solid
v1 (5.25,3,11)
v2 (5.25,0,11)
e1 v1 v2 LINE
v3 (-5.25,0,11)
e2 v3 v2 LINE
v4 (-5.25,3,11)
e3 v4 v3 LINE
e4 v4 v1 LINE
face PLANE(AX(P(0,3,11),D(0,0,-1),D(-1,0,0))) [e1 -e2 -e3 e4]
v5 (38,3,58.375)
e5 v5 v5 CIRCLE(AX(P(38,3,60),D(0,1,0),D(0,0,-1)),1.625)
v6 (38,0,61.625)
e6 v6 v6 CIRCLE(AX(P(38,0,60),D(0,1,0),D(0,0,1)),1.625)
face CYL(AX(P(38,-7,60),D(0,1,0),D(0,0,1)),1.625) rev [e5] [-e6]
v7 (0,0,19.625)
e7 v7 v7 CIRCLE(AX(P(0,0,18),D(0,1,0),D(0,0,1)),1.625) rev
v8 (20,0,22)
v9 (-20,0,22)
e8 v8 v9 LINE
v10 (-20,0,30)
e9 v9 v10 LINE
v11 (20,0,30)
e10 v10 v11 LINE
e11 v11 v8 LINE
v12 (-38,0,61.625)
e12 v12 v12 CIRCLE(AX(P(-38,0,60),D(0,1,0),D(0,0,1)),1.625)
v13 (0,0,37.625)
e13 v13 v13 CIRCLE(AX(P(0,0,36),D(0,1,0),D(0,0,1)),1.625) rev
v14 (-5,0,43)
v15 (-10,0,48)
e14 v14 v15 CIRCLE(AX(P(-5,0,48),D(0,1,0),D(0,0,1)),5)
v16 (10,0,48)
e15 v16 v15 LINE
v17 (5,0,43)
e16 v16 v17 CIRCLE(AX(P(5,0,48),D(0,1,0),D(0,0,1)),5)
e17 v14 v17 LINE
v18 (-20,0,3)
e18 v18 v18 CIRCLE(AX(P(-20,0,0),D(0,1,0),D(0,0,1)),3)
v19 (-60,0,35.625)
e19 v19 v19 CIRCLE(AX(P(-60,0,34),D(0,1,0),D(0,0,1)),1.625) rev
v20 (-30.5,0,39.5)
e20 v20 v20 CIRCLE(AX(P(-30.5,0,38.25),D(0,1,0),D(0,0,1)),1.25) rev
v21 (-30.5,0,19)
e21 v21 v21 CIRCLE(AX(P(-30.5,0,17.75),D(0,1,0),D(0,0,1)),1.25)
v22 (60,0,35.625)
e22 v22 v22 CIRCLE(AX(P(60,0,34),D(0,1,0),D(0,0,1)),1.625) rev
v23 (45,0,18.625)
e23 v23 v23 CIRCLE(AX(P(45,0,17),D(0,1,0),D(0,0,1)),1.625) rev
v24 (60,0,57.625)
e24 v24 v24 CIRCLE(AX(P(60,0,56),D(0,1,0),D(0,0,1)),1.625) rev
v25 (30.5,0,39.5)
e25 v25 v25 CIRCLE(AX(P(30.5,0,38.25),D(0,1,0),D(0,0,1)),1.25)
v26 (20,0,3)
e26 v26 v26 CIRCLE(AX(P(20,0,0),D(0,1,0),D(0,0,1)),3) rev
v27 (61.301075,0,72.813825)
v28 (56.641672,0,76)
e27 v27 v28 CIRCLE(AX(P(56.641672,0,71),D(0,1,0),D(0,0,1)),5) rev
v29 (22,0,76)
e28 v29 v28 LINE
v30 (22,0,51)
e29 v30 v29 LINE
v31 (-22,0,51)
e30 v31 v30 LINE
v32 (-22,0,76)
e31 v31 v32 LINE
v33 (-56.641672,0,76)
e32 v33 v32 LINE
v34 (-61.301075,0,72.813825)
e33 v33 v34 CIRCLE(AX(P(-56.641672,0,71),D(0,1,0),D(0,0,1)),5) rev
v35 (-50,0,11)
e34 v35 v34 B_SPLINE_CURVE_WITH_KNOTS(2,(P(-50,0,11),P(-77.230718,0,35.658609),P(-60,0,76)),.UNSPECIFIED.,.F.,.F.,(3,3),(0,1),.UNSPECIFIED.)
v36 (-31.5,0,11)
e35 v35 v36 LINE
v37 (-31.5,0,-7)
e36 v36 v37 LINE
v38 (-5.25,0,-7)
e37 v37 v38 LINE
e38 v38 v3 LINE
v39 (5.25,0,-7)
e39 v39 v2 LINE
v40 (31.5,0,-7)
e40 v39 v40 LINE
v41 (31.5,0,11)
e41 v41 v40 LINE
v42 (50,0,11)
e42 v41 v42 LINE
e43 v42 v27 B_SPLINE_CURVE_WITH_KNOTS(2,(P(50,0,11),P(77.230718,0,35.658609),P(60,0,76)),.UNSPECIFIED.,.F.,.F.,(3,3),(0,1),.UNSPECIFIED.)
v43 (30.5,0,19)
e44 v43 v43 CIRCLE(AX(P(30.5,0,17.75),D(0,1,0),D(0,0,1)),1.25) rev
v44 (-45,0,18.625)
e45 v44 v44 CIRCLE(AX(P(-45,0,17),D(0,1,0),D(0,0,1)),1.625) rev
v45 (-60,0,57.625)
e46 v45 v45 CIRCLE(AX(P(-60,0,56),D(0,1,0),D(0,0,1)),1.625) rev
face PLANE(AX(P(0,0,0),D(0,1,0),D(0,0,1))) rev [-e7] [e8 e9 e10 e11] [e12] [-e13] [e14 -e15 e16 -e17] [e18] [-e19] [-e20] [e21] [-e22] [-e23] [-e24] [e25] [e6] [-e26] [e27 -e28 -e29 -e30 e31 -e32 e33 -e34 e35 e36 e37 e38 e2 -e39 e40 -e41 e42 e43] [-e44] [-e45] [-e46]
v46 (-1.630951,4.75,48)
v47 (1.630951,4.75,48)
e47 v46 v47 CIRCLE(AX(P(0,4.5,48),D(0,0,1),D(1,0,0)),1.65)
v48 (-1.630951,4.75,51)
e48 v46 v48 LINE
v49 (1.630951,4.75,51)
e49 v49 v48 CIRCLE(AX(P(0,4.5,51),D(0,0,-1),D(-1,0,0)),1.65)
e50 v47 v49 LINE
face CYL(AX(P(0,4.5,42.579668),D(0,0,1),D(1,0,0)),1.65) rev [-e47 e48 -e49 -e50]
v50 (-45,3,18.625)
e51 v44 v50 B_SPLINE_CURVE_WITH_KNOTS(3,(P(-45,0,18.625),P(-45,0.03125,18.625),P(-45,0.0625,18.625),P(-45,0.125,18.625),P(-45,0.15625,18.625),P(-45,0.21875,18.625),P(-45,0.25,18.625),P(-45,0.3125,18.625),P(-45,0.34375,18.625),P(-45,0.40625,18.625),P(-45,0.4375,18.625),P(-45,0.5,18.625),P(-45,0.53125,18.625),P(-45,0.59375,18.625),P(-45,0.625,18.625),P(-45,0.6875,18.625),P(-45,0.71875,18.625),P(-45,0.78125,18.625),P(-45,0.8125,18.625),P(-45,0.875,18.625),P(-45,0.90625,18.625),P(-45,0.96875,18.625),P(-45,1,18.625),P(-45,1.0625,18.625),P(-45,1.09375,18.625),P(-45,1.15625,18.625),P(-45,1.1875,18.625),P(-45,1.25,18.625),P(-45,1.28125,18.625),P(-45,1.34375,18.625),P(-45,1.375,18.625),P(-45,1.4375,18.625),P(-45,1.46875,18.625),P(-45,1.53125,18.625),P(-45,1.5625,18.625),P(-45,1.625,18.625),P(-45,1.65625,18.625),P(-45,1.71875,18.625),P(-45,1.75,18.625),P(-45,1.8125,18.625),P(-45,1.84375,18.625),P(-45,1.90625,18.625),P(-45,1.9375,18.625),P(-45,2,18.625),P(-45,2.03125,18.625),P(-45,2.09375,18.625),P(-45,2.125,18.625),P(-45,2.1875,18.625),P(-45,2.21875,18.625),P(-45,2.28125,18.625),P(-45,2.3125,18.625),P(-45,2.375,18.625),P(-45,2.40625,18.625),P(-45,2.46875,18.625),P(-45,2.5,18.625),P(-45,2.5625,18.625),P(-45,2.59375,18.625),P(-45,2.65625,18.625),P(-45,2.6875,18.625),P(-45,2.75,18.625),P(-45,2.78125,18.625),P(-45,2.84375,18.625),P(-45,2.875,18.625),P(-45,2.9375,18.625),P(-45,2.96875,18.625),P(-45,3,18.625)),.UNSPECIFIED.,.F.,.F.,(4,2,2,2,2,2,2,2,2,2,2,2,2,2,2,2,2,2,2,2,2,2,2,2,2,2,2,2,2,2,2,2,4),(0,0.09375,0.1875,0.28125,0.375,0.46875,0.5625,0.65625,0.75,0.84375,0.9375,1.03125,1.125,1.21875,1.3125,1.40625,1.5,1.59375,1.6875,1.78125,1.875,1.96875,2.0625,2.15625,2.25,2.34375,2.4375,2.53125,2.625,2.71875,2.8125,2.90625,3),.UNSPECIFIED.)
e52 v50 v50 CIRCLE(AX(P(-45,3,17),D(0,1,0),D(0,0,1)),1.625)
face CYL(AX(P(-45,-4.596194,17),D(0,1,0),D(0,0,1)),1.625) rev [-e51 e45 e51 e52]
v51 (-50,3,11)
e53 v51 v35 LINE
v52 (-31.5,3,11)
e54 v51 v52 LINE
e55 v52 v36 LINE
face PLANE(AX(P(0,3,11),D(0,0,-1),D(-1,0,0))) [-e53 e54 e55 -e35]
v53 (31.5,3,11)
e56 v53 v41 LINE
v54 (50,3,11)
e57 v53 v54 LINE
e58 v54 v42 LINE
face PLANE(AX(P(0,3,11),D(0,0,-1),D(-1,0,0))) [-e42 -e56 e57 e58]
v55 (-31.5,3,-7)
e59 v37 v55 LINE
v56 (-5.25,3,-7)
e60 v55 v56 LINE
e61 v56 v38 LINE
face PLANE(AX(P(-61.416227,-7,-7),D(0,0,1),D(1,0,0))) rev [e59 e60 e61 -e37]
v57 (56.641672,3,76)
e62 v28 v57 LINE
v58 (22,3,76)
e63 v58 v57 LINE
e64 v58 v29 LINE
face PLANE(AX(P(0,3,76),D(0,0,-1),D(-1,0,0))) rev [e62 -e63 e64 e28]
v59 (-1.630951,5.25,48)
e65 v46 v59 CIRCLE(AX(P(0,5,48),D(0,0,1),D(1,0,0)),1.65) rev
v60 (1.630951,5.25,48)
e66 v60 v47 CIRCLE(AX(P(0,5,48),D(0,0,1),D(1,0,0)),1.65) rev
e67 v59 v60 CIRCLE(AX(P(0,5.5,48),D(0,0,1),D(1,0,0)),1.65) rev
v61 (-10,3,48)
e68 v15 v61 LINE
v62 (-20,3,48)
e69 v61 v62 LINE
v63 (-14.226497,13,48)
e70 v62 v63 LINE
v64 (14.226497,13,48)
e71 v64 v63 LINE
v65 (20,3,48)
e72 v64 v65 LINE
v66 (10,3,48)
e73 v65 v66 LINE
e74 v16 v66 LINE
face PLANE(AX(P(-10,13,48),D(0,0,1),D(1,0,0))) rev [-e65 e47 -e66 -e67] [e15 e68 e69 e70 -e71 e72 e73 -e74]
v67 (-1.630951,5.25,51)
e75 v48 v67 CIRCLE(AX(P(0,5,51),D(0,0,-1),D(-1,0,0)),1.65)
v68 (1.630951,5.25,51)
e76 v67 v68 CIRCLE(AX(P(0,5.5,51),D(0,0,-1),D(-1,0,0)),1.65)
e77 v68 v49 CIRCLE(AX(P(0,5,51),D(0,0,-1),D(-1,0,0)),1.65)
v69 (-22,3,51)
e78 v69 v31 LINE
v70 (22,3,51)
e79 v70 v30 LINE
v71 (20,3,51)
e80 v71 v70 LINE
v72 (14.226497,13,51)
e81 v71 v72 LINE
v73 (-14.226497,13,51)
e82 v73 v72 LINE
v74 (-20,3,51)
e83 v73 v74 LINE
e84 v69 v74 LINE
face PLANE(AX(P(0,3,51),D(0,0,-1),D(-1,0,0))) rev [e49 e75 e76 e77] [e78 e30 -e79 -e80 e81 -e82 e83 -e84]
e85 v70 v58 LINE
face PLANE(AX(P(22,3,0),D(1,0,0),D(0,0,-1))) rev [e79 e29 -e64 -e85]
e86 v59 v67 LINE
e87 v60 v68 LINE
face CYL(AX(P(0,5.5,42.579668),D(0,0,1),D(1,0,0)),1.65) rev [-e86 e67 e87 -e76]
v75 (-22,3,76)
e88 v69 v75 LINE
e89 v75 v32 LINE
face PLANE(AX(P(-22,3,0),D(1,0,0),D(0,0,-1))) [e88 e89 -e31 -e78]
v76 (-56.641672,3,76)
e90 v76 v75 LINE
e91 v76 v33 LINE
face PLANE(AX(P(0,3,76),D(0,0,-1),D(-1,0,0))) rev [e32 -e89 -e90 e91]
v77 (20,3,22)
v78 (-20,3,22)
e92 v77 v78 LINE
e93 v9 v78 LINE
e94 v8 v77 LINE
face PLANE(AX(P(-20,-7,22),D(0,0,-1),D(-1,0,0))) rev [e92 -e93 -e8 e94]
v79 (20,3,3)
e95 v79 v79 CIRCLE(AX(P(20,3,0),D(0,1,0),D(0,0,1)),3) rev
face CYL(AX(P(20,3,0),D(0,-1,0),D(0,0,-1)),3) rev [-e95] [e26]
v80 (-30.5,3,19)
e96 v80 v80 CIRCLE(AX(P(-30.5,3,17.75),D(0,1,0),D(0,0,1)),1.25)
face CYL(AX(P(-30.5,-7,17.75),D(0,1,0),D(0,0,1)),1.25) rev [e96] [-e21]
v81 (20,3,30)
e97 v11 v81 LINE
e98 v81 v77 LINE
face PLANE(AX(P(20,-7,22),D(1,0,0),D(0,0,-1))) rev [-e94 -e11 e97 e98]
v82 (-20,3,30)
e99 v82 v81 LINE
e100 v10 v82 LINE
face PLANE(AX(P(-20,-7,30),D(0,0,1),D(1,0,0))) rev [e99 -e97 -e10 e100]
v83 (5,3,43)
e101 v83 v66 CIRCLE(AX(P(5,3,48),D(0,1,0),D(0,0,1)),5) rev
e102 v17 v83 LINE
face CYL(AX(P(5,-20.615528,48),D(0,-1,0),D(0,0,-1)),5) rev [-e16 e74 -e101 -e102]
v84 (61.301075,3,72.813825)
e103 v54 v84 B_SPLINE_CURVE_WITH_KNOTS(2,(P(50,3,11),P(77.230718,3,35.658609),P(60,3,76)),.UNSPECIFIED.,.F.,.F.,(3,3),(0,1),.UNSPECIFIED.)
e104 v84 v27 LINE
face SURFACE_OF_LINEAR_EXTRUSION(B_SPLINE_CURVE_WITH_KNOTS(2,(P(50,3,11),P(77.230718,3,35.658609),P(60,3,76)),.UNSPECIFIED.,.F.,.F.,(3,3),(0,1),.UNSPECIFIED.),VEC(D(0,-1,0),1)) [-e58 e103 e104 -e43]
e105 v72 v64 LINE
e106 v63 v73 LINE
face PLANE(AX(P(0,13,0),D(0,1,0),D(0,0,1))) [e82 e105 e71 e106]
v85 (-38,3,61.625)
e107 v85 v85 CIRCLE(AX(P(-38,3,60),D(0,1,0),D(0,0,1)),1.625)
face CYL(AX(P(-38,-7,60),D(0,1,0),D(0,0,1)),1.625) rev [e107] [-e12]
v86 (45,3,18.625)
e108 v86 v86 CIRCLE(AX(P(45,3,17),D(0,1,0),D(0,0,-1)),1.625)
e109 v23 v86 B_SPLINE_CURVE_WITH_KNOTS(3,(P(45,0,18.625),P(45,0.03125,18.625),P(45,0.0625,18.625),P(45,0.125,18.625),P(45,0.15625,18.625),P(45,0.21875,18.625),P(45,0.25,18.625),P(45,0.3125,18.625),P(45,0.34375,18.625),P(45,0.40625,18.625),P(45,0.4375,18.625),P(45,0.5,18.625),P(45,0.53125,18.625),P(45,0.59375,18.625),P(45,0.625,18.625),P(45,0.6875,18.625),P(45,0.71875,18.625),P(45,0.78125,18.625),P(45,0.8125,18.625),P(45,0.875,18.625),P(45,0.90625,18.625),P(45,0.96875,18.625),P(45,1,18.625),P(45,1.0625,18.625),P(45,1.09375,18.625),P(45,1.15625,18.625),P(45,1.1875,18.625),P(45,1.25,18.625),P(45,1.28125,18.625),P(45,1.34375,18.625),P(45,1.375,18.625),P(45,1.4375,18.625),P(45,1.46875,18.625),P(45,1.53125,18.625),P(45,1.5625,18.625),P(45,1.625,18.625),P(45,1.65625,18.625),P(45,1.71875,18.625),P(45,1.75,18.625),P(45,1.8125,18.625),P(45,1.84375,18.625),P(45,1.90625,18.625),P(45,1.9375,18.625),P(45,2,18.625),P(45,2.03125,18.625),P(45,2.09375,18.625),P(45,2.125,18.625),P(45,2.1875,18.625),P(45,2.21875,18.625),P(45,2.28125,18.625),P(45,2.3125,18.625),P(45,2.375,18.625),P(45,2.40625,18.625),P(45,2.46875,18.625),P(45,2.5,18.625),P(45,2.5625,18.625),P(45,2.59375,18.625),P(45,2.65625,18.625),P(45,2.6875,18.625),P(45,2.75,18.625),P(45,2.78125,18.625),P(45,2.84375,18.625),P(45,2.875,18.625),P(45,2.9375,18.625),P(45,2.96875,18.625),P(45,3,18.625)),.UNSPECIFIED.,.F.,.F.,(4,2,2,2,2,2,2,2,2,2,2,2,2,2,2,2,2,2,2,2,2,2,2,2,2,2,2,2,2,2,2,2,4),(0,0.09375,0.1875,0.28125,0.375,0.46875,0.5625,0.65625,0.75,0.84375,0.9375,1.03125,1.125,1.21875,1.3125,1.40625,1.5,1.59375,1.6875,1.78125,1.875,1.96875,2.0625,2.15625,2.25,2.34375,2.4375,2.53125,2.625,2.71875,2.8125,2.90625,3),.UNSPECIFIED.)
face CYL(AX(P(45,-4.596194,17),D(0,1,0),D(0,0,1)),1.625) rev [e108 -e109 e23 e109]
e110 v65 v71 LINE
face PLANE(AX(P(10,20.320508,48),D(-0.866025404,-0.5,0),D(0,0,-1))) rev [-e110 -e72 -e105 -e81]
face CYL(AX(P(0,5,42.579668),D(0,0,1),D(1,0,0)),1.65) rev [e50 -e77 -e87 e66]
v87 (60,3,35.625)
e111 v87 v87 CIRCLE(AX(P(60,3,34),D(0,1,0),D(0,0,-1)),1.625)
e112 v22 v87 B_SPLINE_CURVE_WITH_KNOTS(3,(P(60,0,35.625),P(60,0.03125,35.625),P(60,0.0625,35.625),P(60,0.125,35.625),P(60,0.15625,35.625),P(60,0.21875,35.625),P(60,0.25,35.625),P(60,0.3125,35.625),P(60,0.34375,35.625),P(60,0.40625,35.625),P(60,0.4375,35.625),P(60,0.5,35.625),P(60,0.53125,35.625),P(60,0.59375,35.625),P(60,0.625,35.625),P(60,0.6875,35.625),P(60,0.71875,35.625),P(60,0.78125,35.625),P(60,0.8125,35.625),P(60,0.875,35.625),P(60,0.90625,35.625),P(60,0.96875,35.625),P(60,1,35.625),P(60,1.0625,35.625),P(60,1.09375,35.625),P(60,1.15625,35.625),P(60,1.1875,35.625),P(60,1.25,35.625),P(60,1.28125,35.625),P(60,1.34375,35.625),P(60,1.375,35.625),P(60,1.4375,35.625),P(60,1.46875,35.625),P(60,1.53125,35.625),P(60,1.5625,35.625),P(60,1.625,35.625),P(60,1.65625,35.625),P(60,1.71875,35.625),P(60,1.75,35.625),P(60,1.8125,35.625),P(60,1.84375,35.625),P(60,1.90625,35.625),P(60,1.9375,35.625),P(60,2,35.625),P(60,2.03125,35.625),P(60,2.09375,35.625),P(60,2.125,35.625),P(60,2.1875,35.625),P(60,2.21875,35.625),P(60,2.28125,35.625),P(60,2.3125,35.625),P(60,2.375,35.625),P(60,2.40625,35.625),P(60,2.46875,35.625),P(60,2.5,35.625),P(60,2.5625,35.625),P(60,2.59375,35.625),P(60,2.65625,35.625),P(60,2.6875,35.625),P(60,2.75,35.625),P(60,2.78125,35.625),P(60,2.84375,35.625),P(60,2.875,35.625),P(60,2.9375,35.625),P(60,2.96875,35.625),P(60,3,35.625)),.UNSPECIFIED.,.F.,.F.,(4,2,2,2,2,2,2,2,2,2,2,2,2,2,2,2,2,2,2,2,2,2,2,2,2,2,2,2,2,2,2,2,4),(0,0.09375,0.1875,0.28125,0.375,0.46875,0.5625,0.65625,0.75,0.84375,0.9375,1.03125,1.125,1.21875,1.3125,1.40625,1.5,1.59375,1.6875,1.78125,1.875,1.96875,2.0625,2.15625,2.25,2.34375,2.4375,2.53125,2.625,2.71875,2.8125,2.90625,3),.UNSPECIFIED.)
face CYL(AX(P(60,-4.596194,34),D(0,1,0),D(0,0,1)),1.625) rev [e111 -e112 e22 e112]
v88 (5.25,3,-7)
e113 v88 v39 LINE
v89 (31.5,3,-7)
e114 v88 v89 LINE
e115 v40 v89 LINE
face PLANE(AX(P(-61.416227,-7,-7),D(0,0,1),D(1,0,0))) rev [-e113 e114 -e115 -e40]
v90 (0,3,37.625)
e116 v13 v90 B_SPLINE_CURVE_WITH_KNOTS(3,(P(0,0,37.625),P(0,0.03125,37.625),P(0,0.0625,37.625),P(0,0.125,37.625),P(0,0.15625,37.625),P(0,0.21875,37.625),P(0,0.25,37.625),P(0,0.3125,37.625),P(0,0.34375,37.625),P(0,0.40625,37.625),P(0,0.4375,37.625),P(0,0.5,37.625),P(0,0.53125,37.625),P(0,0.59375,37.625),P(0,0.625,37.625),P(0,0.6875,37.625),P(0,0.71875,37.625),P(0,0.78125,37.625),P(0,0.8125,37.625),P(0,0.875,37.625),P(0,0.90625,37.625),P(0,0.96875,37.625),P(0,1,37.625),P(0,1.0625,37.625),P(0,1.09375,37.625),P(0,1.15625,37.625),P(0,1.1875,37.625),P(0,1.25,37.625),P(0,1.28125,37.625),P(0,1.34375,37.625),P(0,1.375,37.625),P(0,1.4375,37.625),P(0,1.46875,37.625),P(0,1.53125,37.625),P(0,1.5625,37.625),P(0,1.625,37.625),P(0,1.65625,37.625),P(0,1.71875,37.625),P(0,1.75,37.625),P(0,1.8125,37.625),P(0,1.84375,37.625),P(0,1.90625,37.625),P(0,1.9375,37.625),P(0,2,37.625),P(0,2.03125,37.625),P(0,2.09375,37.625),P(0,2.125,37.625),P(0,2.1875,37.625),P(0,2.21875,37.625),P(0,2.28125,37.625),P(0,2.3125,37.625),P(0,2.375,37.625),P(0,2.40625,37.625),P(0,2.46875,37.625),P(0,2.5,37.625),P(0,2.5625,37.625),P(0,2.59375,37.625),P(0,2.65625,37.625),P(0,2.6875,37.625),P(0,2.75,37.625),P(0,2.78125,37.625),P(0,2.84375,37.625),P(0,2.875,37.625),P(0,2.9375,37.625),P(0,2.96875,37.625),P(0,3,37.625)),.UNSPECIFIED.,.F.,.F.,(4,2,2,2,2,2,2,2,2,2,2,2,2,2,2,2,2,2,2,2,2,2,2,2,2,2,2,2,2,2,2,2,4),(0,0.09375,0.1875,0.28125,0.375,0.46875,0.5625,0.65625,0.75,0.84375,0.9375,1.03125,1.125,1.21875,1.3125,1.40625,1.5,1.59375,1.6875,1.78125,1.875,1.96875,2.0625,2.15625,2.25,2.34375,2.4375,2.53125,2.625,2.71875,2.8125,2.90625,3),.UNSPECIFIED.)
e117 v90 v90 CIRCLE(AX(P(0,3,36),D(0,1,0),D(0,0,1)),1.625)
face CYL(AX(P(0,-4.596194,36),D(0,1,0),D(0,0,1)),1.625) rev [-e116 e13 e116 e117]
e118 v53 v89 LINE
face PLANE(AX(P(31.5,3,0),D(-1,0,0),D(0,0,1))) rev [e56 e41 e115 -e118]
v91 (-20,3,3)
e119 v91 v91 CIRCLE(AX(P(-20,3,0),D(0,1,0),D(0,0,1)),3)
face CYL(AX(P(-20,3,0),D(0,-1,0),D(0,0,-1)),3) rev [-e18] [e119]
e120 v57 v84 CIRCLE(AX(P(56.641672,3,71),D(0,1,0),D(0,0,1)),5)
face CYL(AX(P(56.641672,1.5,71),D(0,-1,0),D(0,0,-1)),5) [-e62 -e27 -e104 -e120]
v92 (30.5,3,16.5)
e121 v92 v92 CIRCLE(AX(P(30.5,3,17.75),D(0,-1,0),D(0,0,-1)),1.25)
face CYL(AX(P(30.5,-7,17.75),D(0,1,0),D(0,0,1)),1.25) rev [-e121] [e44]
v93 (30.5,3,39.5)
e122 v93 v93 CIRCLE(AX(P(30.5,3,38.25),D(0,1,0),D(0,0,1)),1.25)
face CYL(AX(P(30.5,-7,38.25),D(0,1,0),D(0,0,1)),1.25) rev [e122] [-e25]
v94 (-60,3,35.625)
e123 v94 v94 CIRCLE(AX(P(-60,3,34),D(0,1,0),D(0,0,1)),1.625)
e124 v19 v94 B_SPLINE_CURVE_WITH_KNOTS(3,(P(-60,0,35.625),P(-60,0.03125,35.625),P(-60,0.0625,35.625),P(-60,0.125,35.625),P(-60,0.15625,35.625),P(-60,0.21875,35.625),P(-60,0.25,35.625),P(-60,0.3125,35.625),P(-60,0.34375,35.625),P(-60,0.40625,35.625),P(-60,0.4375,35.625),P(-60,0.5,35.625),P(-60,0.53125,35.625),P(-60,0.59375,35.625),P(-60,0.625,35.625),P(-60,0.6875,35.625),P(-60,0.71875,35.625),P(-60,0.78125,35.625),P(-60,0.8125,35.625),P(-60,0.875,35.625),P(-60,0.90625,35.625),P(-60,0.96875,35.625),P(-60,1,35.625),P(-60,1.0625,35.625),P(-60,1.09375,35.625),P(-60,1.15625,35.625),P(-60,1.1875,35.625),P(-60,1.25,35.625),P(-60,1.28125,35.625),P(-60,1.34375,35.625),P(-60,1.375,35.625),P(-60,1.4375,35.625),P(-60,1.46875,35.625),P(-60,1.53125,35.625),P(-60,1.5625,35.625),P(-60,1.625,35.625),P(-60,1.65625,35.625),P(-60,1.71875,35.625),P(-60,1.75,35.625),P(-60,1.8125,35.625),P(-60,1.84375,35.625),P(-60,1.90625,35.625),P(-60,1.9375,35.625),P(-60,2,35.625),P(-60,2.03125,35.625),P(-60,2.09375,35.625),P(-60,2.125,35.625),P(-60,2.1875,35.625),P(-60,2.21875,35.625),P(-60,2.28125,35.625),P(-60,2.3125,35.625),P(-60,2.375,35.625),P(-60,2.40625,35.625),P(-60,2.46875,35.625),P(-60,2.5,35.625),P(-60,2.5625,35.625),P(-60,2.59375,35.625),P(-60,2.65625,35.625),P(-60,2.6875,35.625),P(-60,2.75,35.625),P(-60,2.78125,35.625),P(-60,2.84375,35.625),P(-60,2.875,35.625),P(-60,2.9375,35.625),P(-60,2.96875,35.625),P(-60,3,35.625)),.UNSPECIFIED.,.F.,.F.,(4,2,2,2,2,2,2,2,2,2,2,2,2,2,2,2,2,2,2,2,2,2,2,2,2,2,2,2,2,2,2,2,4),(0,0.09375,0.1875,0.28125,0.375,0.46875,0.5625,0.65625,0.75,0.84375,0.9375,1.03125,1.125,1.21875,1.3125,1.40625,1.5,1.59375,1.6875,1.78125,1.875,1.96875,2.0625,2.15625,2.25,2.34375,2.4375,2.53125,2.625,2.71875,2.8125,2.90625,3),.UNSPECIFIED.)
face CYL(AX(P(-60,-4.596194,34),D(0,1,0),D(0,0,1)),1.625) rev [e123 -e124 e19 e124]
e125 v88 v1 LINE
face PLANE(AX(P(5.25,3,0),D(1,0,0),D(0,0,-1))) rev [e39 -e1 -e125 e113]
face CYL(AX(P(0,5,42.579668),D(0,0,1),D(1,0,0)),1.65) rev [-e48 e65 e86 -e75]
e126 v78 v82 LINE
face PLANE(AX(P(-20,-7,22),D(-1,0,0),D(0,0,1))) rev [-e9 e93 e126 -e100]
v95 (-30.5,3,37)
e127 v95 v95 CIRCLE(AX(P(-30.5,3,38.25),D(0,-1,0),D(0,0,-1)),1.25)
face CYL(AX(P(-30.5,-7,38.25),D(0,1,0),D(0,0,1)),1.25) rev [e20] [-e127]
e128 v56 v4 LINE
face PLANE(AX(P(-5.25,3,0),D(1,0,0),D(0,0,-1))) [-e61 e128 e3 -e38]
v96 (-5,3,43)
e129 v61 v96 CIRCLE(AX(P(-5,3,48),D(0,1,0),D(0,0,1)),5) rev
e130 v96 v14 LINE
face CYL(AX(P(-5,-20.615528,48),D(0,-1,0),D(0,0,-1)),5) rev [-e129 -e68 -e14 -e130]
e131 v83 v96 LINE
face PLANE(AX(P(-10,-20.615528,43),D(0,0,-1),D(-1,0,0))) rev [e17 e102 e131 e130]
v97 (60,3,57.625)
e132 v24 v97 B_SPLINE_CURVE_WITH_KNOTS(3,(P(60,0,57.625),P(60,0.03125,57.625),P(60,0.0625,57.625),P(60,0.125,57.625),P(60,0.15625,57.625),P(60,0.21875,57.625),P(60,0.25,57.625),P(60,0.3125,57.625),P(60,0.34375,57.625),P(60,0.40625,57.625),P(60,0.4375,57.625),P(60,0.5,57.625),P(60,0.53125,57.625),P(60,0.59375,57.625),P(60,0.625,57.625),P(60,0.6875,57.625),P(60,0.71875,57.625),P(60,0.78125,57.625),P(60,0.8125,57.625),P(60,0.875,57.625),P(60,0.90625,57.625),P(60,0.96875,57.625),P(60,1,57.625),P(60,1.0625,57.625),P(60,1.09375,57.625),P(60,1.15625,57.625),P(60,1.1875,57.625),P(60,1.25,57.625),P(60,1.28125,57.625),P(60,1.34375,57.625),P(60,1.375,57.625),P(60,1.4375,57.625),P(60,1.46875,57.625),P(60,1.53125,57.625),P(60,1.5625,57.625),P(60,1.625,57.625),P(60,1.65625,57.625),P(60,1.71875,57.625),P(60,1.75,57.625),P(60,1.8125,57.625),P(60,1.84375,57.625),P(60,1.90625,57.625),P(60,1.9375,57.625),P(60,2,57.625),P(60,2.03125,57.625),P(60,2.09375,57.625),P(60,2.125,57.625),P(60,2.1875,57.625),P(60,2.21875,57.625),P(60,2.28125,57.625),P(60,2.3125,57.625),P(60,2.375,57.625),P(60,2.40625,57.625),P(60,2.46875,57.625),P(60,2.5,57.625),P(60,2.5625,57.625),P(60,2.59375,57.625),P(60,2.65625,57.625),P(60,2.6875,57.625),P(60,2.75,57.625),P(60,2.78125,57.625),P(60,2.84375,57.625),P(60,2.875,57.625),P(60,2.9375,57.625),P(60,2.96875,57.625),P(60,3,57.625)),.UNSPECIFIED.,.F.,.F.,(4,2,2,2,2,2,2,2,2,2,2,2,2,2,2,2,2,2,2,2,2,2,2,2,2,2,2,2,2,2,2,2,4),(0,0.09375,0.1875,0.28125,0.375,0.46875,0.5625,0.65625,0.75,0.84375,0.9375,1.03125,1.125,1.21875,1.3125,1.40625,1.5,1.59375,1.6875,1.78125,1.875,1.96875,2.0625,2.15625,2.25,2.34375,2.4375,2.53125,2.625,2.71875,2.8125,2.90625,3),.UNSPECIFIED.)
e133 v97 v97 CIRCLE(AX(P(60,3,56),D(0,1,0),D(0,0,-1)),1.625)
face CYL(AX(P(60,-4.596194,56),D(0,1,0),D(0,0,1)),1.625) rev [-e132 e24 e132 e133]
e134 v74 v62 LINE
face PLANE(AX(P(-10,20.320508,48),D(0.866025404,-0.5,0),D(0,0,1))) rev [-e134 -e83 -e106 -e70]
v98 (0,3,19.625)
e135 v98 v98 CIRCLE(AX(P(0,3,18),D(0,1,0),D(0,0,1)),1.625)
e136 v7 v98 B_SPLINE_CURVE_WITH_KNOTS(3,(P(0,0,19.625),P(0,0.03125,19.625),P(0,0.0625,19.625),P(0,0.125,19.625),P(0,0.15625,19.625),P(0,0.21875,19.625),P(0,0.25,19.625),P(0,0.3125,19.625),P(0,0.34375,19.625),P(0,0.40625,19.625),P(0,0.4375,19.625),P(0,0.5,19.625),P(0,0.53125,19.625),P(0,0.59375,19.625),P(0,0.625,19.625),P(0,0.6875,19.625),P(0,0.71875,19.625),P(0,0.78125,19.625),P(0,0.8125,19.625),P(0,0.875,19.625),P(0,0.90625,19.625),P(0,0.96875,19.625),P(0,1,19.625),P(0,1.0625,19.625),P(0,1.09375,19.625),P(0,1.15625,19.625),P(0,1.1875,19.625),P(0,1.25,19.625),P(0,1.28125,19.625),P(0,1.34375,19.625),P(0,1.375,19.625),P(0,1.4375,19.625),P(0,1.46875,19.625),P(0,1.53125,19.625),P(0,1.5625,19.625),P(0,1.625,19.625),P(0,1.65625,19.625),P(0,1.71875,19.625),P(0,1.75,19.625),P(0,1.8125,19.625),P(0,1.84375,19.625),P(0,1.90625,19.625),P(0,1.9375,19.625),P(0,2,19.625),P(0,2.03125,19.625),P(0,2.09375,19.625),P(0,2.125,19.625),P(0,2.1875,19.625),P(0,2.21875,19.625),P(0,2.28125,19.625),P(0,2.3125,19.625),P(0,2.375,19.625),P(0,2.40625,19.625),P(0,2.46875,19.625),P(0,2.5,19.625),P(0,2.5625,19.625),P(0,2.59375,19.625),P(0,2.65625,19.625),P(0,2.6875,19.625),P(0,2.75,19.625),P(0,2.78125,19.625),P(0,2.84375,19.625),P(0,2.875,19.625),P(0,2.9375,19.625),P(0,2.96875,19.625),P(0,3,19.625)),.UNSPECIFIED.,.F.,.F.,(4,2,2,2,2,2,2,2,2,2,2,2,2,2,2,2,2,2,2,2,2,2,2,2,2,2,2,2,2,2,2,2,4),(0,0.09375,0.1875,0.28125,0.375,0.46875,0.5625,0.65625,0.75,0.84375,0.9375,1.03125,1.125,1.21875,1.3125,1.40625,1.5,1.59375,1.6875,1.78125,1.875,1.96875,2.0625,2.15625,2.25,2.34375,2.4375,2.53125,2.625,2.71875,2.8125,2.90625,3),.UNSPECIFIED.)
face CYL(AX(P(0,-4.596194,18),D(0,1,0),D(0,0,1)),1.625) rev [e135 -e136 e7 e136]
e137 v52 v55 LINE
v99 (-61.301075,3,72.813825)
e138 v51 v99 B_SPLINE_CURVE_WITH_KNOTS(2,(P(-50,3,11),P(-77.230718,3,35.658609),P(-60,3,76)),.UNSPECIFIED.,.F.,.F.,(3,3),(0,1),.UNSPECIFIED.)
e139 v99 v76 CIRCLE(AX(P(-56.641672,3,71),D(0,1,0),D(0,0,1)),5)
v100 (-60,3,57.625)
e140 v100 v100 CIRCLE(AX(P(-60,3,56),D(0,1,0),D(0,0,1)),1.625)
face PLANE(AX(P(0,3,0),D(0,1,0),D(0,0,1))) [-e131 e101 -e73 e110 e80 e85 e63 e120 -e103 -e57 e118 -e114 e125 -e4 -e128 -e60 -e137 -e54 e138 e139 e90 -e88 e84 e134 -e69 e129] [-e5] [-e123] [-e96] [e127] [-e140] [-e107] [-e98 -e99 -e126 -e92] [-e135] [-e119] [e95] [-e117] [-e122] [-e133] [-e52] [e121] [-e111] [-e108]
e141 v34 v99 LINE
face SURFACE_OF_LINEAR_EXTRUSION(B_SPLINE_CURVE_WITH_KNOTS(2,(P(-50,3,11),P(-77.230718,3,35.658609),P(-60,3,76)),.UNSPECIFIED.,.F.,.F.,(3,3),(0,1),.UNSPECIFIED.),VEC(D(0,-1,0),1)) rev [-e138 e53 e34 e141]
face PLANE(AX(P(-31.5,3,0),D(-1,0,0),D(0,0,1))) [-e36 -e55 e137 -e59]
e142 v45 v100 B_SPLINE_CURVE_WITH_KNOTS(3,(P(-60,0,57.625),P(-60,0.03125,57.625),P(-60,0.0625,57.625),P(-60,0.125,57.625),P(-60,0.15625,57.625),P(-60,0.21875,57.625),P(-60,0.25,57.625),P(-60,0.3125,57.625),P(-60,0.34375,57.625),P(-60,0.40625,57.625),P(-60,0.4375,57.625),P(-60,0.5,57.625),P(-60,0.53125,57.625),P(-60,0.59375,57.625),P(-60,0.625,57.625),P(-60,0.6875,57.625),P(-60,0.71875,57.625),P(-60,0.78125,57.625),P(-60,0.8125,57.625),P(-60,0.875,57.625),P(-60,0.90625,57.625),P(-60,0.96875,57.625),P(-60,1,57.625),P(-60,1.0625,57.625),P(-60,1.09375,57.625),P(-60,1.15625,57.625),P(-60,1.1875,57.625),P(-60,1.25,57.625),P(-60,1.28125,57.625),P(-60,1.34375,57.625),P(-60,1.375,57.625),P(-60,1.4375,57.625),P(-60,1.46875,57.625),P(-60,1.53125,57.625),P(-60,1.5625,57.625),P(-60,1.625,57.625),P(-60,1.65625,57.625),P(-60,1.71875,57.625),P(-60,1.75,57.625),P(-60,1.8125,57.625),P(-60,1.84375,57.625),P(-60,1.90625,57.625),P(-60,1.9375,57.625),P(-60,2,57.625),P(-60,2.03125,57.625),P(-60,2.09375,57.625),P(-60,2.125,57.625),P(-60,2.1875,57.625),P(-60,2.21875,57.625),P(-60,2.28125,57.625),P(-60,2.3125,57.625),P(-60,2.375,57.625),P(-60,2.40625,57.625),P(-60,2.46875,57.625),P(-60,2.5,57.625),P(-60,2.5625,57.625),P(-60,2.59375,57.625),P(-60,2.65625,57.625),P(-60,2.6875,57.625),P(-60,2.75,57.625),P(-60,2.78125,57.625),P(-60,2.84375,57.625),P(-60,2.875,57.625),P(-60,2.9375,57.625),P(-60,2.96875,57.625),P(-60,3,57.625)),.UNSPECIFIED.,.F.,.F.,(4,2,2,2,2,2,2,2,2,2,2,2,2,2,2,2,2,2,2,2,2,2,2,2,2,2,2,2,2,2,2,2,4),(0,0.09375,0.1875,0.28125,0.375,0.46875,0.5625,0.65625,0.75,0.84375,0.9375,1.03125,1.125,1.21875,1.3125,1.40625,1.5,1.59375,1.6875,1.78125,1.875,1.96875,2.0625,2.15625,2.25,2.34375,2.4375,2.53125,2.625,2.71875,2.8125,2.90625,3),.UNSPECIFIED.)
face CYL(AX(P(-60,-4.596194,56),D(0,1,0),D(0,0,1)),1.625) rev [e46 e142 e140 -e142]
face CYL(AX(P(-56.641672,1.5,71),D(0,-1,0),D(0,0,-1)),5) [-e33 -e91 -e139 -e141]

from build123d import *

# Parameters (mm, degrees)
SKETCH1_W           = 26.25
SKETCH1_H           = 22
SKETCH1_R           = 3
BOSS_EXTRUDE1_DEPTH = 3
FILLET1_R           = 5
SKETCH2_R           = 1.625
CUT_EXTRUDE1_DEPTH  = 3
SKETCH5_W           = 20
SKETCH5_H           = 3
BOSS_EXTRUDE2_DEPTH = 10
SKETCH6_R           = 1.65
CUT_EXTRUDE4_DEPTH  = 28
CHAMFER1_SIZE       = 10
CHAMFER1_SIZE_2     = 17.320508076
SKETCH9_W           = 20
SKETCH9_H           = 5
CUT_EXTRUDE6_DEPTH  = 3
FILLET3_R           = 5
SKETCH16_W          = 40
SKETCH16_H          = 8
CUT_EXTRUDE11_DEPTH = 10
SKETCH17_R          = 1.25
CUT_EXTRUDE12_DEPTH = 10
SKETCH18_W          = 114.543980026
SKETCH18_H          = 4
CUT_EXTRUDE13_DEPTH = 10
SKETCH3_R           = 1.625
CUT_EXTRUDE14_DEPTH = 10


# Some blends are built 0.0001 mm under size
with BuildPart() as part:
    # Sketch1 → Boss-Extrude1 (new body)
    # profile 1 of 3: a face of its own
    with BuildSketch(Plane(origin=(0, 0, 0), x_dir=(1, 0, 0), z_dir=(0, 1, 0))):
        with Locations((18.375, 0)):
            Rectangle(SKETCH1_W, SKETCH1_H)
        with Locations(Location((20, 0, 0), (0, 0, 270))):
            Circle(SKETCH1_R, mode=Mode.SUBTRACT)
    # profile 2 of 3: a face of its own
    with BuildSketch(Plane(origin=(0, 0, 0), x_dir=(1, 0, 0), z_dir=(0, 1, 0))):
        with Locations((-18.375, 0)):
            Rectangle(SKETCH1_W, SKETCH1_H)
        with Locations(Location((-20, 0, 0), (0, 0, 270))):
            Circle(SKETCH1_R, mode=Mode.SUBTRACT)
    # profile 3 of 3: a face of its own
    with BuildSketch(Plane(origin=(0, 0, 0), x_dir=(1, 0, 0), z_dir=(0, 1, 0))):
        with BuildLine():
            Line((-5.25, -11), (-31.5, -11))
            Line((-31.5, -11), (-50, -11))
            add(Edge.make_bspline(
                [(-50, -11), (-77.2307176, -35.658609428), (-60, -76)],
                knots=[0, 0, 0, 1, 1, 1], degree=2))
            Line((-60, -76), (-22, -76))
            Line((-22, -76), (-22, -51))
            Line((-22, -51), (22, -51))
            Line((22, -51), (22, -76))
            Line((22, -76), (60, -76))
            add(Edge.make_bspline(
                [(50, -11), (77.2307176, -35.658609428), (60, -76)],
                knots=[0, 0, 0, 1, 1, 1], degree=2))
            Line((50, -11), (31.5, -11))
            Line((31.5, -11), (5.25, -11))
            Line((5.25, -11), (-5.25, -11))
        make_face()
    extrude(amount=BOSS_EXTRUDE1_DEPTH)

    # Fillet1
    fillet1_edges = [part.edges().sort_by_distance(p)[0] for p in [
        (60, 1.5, 76),
        (-60, 1.5, 76),
    ]]
    fillet(fillet1_edges, radius=FILLET1_R)

    # Sketch2 → Cut-Extrude1 (cut)
    with BuildSketch(Plane(origin=(0, 3, 0), x_dir=(1, 0, 0), z_dir=(0, 1, 0))):
        with Locations(Location((-60, -56, 0), (0, 0, 270))):
            Circle(SKETCH2_R)
        with Locations(Location((60, -56, 0), (0, 0, 270))):
            Circle(SKETCH2_R)
        with Locations(Location((-45, -17, 0), (0, 0, 270))):
            Circle(SKETCH2_R)
        with Locations(Location((-60, -34, 0), (0, 0, 270))):
            Circle(SKETCH2_R)
        with Locations(Location((60, -34, 0), (0, 0, 270))):
            Circle(SKETCH2_R)
        with Locations(Location((45, -17, 0), (0, 0, 270))):
            Circle(SKETCH2_R)
        with Locations(Location((0, -18, 0), (0, 0, 270))):
            Circle(SKETCH2_R)
        with Locations(Location((0, -36, 0), (0, 0, 270))):
            Circle(SKETCH2_R)
    extrude(amount=-CUT_EXTRUDE1_DEPTH, mode=Mode.SUBTRACT)

    # Sketch5 → Boss-Extrude2 (add)
    with BuildSketch(Plane(origin=(0, 3, 0), x_dir=(1, 0, 0), z_dir=(0, 1, 0))):
        with Locations((0, -49.5)):
            Rectangle(SKETCH5_W, SKETCH5_H)
    extrude(amount=BOSS_EXTRUDE2_DEPTH)

    # Sketch6 → Cut-Extrude4 (cut)
    with BuildSketch(Plane.XY.offset(76)):
        with Locations((0, 5)):
            Circle(SKETCH6_R)
        with Locations((0, 5.5)):
            Circle(SKETCH6_R)
        with Locations((0, 4.5)):
            Circle(SKETCH6_R)
    extrude(amount=-CUT_EXTRUDE4_DEPTH, mode=Mode.SUBTRACT)

    # Chamfer1
    # the kernel refuses this chamfer: 17.320508076, 10 mm, written as the material it adds along each edge
    with BuildSketch(Plane(origin=(-10, 3, 51), x_dir=(-0.9983227437537926, -0.05789386240267139, 0), z_dir=(0, 0, -1))) as chamfer1_piece_1_section:
        Polygon((CHAMFER1_SIZE * 0.998322743754, CHAMFER1_SIZE * 0.0578938624027), (-CHAMFER1_SIZE_2 * 0.0578938624016, CHAMFER1_SIZE_2 * 0.998322743736), (0, 0), align=None)
    chamfer1_piece_1 = extrude(amount=3, mode=Mode.PRIVATE)
    chamfer1_piece_1 = split(chamfer1_piece_1, bisect_by=Plane(origin=(-13.731694811, 13, 49.5), z_dir=(0, -1, 0)), keep=Keep.TOP, mode=Mode.PRIVATE)
    add(chamfer1_piece_1)
    with BuildSketch(Plane(origin=(10, 3, 48), x_dir=(0.9983227437537926, -0.05789386240267137, 0), z_dir=(0, 0, 1))) as chamfer1_piece_2_section:
        Polygon((CHAMFER1_SIZE * 0.998322743754, CHAMFER1_SIZE * 0.0578938624027), (-CHAMFER1_SIZE_2 * 0.0578938624016, CHAMFER1_SIZE_2 * 0.998322743736), (0, 0), align=None)
    chamfer1_piece_2 = extrude(amount=3, mode=Mode.PRIVATE)
    chamfer1_piece_2 = split(chamfer1_piece_2, bisect_by=Plane(origin=(13.731694811, 13, 49.5), z_dir=(0, -1, 0)), keep=Keep.TOP, mode=Mode.PRIVATE)
    add(chamfer1_piece_2)

    # Sketch9 → Cut-Extrude6 (cut)
    with BuildSketch(Plane(origin=(0, 3, 0), x_dir=(1, 0, 0), z_dir=(0, 1, 0))):
        with Locations((0, -45.5)):
            Rectangle(SKETCH9_W, SKETCH9_H)
    extrude(amount=-CUT_EXTRUDE6_DEPTH, mode=Mode.SUBTRACT)

    # Fillet3
    fillet3_edges = [part.edges().sort_by_distance(p)[0] for p in [
        (-10, 1.5, 43),
        (10, 1.5, 43),
    ]]
    fillet(fillet3_edges, radius=FILLET3_R - 0.0001)  # a hair under: the kernel refuses the full size

    # Sketch16 → Cut-Extrude11 (cut)
    with BuildSketch(Plane(origin=(0, 3, 0), x_dir=(1, 0, 0), z_dir=(0, 1, 0))):
        with Locations((0, -26)):
            Rectangle(SKETCH16_W, SKETCH16_H)
    extrude(amount=-CUT_EXTRUDE11_DEPTH, mode=Mode.SUBTRACT)

    # Sketch17 → Cut-Extrude12 (cut)
    with BuildSketch(Plane(origin=(0, 3, 0), x_dir=(1, 0, 0), z_dir=(0, 1, 0))):
        with Locations(Location((-30.5, -17.75, 0), (0, 0, 270))):
            Circle(SKETCH17_R)
        with Locations(Location((-30.5, -38.25, 0), (0, 0, 270))):
            Circle(SKETCH17_R)
        with Locations(Location((30.5, -38.25, 0), (0, 0, 270))):
            Circle(SKETCH17_R)
        with Locations(Location((30.5, -17.75, 0), (0, 0, 270))):
            Circle(SKETCH17_R)
    extrude(amount=-CUT_EXTRUDE12_DEPTH, mode=Mode.SUBTRACT)

    # Sketch18 → Cut-Extrude13 (cut)
    with BuildSketch(Plane(origin=(0, 3, 0), x_dir=(1, 0, 0), z_dir=(0, 1, 0))):
        with Locations((-4.144236525, 9)):
            Rectangle(SKETCH18_W, SKETCH18_H)
    extrude(amount=-CUT_EXTRUDE13_DEPTH, mode=Mode.SUBTRACT)

    # Sketch3 → Cut-Extrude14 (cut)
    with BuildSketch(Plane(origin=(0, 3, 0), x_dir=(1, 0, 0), z_dir=(0, 1, 0))):
        with Locations(Location((-38, -60, 0), (0, 0, 270))):
            Circle(SKETCH3_R)
        with Locations(Location((38, -60, 0), (0, 0, 270))):
            Circle(SKETCH3_R)
    extrude(amount=-CUT_EXTRUDE14_DEPTH, mode=Mode.SUBTRACT)


solid = part.part
